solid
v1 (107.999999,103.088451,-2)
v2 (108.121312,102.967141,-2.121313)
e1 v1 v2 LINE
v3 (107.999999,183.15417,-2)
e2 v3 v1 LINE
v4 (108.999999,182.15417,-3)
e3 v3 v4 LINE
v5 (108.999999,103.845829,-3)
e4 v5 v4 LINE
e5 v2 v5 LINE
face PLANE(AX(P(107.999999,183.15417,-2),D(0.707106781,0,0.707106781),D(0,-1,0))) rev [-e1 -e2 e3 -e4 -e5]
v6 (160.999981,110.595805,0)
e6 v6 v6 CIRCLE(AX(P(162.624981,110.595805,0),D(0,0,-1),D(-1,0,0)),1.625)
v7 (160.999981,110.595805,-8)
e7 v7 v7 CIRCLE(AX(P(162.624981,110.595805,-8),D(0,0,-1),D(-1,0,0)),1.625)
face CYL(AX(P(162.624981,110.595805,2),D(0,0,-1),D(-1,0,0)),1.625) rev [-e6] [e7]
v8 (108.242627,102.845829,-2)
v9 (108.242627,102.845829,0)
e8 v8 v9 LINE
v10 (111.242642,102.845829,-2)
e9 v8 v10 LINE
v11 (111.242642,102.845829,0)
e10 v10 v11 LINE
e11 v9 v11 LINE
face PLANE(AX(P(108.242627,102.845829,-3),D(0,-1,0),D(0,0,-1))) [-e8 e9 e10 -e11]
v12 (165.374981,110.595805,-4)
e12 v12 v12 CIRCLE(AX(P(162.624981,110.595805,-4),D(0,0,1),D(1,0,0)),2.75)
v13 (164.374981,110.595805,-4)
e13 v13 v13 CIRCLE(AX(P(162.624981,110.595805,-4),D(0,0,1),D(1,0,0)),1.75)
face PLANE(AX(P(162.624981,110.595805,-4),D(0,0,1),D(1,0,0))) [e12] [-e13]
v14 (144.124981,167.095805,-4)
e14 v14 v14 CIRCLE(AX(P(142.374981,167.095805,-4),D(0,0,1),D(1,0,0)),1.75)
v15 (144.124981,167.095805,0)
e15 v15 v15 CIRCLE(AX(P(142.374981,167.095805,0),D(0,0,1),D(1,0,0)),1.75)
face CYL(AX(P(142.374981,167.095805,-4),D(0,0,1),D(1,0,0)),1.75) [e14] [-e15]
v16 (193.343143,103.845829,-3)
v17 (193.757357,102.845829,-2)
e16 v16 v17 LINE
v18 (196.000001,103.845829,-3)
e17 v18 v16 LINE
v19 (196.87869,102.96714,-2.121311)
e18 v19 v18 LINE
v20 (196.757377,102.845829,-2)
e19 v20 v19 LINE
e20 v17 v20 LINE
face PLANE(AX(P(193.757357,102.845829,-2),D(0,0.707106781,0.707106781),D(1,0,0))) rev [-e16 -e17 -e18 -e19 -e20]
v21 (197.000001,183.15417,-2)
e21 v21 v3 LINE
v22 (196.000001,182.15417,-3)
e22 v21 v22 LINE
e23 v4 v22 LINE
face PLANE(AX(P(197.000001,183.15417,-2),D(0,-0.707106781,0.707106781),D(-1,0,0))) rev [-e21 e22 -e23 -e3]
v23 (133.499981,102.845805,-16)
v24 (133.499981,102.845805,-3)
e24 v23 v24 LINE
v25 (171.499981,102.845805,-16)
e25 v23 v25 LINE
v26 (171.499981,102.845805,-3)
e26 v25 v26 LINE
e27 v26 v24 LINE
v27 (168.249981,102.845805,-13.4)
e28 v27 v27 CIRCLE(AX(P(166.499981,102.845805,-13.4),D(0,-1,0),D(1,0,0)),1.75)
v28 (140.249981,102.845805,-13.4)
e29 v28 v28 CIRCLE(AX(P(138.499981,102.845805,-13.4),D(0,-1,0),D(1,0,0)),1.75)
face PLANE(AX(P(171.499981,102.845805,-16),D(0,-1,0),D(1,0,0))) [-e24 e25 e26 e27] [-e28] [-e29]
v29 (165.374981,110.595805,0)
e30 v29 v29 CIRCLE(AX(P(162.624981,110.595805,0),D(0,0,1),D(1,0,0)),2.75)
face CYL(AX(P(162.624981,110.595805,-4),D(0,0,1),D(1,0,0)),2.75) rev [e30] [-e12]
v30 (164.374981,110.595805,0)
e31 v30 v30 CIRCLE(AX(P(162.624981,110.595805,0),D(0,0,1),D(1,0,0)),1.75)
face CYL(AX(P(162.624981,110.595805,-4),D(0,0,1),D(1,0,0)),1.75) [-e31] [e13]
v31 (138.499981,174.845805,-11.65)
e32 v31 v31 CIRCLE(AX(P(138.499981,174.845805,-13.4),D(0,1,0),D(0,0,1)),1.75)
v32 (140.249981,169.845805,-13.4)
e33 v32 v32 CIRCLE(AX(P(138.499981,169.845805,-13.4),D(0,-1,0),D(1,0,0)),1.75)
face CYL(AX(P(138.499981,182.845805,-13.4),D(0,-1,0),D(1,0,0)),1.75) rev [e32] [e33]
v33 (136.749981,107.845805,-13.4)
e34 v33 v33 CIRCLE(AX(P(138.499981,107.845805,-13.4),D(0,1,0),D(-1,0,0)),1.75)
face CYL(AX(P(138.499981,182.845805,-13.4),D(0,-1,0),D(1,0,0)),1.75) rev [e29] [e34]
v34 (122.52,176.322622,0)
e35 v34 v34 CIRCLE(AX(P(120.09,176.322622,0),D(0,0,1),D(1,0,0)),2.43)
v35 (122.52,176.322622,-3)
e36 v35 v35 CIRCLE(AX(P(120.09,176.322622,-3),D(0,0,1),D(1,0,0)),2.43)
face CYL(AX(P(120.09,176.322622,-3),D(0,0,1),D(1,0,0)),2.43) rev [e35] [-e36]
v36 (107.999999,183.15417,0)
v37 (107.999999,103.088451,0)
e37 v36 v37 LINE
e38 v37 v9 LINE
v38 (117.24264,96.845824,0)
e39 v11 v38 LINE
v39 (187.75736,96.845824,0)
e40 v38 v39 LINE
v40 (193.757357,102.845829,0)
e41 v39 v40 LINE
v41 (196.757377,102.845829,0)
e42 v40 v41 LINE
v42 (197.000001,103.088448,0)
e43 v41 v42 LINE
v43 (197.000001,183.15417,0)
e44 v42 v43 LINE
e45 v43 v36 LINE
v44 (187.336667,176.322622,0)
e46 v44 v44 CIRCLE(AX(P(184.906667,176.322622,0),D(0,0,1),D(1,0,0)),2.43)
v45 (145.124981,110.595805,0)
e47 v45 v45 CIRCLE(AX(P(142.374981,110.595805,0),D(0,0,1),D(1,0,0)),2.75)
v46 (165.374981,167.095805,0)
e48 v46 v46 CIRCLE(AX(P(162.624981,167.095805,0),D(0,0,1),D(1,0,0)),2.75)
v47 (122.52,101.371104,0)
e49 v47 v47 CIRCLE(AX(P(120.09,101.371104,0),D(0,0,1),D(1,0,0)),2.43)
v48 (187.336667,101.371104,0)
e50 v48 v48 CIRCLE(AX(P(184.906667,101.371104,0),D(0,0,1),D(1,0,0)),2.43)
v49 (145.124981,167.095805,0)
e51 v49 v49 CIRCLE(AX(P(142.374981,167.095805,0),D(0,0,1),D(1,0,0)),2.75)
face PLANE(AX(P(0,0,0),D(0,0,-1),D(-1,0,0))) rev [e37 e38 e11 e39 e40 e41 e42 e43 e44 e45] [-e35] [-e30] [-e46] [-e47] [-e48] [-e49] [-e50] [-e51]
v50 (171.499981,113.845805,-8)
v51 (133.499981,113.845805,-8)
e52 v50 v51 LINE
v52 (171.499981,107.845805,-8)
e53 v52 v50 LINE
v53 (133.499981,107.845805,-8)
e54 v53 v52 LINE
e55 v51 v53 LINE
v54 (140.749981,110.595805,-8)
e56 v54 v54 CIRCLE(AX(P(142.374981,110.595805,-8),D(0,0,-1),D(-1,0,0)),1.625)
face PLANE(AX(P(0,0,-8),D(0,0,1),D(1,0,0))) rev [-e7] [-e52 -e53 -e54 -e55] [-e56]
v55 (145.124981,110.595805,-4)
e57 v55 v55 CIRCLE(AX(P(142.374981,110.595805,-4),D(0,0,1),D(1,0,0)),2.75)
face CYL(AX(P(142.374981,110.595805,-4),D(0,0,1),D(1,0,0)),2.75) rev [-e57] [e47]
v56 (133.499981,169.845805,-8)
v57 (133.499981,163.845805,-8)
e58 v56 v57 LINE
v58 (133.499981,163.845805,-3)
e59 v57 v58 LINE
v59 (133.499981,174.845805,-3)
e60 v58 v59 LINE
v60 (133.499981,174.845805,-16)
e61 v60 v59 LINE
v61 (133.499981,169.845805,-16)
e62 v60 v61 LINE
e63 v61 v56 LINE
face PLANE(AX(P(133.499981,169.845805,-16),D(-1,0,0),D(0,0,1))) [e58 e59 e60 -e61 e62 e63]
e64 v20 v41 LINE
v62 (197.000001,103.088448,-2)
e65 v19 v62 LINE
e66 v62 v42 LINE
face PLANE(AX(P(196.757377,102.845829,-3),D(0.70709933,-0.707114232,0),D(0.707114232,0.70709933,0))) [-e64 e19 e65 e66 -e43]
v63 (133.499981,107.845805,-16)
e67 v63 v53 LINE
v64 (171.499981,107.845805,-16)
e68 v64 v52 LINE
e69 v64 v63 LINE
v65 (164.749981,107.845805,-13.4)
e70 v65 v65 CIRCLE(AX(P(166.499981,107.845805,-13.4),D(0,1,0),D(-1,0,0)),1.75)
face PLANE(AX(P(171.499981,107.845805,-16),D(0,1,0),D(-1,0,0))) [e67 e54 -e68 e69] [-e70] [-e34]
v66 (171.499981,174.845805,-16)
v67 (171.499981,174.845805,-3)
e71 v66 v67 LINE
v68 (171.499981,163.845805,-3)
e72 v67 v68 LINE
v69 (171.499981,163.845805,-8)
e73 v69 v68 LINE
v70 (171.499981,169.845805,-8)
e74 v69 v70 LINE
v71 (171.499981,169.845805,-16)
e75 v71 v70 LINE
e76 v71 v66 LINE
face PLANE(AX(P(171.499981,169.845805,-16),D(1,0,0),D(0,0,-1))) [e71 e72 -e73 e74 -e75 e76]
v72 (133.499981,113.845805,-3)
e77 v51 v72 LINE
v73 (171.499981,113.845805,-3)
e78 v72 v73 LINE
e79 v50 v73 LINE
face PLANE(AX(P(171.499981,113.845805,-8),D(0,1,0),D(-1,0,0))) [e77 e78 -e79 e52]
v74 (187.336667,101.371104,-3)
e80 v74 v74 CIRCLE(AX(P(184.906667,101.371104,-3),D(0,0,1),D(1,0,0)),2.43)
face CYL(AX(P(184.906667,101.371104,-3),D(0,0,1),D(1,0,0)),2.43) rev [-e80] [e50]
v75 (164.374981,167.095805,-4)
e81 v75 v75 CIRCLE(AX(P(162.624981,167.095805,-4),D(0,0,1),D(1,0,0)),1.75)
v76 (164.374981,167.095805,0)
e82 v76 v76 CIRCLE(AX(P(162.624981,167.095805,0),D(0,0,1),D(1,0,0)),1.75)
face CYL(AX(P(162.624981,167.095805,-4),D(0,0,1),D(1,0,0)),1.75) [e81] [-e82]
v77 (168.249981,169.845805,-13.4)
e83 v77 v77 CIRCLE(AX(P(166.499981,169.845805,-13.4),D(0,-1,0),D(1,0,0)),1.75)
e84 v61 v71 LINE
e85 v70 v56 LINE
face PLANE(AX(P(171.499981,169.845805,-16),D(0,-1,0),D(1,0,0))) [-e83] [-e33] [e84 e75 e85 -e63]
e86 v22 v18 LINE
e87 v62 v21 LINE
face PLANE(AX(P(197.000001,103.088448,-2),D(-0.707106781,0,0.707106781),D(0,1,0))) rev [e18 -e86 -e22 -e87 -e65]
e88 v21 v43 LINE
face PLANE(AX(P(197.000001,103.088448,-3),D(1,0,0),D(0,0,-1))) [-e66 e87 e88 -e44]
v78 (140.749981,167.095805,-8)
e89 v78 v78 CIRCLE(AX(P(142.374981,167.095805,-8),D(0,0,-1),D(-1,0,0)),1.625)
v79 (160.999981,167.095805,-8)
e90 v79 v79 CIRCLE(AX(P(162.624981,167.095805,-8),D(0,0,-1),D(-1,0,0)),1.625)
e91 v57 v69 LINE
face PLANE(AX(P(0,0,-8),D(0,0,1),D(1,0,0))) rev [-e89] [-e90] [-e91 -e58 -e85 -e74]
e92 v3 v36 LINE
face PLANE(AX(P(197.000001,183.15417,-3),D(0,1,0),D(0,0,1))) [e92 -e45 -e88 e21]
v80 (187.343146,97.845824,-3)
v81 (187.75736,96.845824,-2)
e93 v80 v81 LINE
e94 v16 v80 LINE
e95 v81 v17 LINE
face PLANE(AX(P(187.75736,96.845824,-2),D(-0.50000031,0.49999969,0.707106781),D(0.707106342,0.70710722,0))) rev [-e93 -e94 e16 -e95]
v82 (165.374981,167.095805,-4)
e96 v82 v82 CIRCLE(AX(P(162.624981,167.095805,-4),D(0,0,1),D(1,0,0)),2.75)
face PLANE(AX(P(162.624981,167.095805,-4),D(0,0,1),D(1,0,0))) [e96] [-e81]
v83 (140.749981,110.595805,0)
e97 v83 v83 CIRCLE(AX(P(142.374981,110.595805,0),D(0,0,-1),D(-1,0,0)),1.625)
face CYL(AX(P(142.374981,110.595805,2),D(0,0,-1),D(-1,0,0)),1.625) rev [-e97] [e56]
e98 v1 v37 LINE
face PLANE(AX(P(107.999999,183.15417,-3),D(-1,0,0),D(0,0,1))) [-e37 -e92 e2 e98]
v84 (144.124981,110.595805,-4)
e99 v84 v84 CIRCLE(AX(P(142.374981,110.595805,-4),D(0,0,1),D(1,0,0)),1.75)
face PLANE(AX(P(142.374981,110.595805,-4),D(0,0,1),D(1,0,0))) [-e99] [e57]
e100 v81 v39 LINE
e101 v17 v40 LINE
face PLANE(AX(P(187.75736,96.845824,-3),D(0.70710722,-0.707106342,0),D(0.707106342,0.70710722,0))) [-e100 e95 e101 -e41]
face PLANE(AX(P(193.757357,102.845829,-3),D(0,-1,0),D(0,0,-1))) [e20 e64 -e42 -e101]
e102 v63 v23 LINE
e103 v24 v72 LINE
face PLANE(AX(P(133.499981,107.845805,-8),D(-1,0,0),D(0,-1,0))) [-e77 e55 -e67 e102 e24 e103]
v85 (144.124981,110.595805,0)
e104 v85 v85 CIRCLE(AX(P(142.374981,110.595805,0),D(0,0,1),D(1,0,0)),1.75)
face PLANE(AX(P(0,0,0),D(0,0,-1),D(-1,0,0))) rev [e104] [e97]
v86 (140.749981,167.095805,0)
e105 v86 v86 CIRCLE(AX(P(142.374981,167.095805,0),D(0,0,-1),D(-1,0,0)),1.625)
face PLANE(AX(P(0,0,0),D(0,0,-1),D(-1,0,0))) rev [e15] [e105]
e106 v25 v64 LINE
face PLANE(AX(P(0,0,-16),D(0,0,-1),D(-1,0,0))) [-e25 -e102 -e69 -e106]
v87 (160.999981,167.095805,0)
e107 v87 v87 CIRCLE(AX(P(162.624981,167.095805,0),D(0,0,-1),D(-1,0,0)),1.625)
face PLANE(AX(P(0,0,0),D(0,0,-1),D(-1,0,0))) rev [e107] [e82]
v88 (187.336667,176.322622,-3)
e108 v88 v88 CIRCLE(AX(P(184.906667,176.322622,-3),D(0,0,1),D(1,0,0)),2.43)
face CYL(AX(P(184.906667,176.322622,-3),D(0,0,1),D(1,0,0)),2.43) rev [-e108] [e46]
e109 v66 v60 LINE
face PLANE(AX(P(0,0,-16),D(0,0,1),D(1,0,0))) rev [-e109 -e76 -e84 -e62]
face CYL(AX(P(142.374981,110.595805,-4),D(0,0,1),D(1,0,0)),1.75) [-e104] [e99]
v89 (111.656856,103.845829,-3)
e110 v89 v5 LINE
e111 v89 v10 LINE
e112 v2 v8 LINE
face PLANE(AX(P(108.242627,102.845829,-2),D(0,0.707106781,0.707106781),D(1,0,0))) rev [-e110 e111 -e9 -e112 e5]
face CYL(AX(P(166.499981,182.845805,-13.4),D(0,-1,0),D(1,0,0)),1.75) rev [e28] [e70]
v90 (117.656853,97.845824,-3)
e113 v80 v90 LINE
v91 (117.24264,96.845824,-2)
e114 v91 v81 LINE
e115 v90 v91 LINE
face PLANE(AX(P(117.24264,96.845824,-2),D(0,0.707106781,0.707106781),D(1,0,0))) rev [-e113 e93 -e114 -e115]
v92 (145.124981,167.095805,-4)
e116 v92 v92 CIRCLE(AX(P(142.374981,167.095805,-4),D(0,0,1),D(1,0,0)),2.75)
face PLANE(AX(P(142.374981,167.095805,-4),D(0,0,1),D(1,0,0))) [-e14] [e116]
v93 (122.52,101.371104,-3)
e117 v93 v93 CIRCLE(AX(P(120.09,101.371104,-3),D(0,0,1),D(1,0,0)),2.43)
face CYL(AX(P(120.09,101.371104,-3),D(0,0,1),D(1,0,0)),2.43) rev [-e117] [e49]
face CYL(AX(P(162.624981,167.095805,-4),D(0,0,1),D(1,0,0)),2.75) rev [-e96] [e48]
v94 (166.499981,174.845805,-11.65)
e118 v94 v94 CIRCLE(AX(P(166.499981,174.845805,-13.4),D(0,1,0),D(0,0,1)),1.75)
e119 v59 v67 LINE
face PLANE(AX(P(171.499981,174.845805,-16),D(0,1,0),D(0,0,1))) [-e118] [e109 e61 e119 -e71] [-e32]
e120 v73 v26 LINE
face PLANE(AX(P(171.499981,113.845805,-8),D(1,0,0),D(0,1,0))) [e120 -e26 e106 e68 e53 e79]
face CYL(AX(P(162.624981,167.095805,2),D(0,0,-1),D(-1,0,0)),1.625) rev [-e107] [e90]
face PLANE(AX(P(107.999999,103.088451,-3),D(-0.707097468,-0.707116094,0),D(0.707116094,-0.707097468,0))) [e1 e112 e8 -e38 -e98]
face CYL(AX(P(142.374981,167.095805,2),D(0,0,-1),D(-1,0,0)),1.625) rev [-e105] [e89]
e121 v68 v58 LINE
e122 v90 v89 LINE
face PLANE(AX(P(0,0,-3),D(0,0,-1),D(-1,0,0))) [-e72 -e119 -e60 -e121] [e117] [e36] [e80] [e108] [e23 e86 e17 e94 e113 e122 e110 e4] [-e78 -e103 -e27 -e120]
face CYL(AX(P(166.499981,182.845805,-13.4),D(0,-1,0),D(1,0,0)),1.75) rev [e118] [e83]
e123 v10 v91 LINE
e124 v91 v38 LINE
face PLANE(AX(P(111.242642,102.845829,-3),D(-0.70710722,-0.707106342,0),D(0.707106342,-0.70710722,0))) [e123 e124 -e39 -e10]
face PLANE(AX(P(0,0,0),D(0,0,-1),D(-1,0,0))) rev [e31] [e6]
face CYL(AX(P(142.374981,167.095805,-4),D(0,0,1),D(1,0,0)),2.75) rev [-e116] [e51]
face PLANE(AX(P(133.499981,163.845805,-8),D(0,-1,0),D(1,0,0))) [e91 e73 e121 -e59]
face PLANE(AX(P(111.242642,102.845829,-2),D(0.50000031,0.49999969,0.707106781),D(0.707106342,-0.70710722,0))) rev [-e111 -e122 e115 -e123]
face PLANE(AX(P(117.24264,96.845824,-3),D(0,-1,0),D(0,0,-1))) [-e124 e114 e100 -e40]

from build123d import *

# Parameters (mm, degrees)
SKETCH3_W             = 38
SKETCH3_H             = 6
BOSS_EXTRUDE2_DEPTH   = 8
BOSS_EXTRUDE2_2_DEPTH = 8
SKETCH1_R             = 2.43
BOSS_EXTRUDE3_DEPTH   = 3
CHAMFER1_SIZE         = 1
SKETCH4_W             = 38
SKETCH4_H             = 5
BOSS_EXTRUDE4_DEPTH   = 16
SKETCH5_R             = 1.75
CUT_EXTRUDE1_DEPTH    = 80
SKETCH6_R             = 1.625
CUT_EXTRUDE2_DEPTH    = 10
SKETCH7_R             = 2.75
SKETCH7_R_2           = 1.75
CUT_EXTRUDE3_DEPTH    = 4


with BuildPart() as part:
    # Sketch3 → Boss-Extrude2 (new body)
    with BuildSketch(Plane.XY):
        with Locations((152.499981225, 110.845805079)):
            Rectangle(SKETCH3_W, SKETCH3_H)
    extrude(amount=-BOSS_EXTRUDE2_DEPTH)



with BuildPart() as body_2:
    # Sketch3 → Boss-Extrude2 2 (new body)
    with BuildSketch(Plane.XY):
        with Locations((152.499981225, 166.845805079)):
            Rectangle(SKETCH3_W, SKETCH3_H)
    extrude(amount=-BOSS_EXTRUDE2_2_DEPTH)


with BuildPart() as body_3:
    # Sketch1 → Boss-Extrude3 (new body)
    with BuildSketch(Plane.XY):
        Polygon((197.000000954, 103.088447924), (197.000000954, 183.154169798), (107.999998748, 183.154169798), (107.999998748, 103.08845101), (108.242627497, 102.845828652), (111.242642284, 102.845828652), (117.242639543, 96.845823944), (187.757360159, 96.845823944), (193.757357418, 102.845828652), (196.757376569, 102.845828652), align=None)
        with Locations((184.906666899, 176.322621726)):
            Circle(SKETCH1_R, mode=Mode.SUBTRACT)
        with Locations((120.09, 176.322621726)):
            Circle(SKETCH1_R, mode=Mode.SUBTRACT)
        with Locations((184.906666899, 101.371103796)):
            Circle(SKETCH1_R, mode=Mode.SUBTRACT)
        with Locations((120.09, 101.371103796)):
            Circle(SKETCH1_R, mode=Mode.SUBTRACT)
    extrude(amount=-BOSS_EXTRUDE3_DEPTH)

    # Chamfer1
    # the kernel refuses this chamfer: 1 mm, written as the material it takes off along each edge
    with BuildSketch(Plane(origin=(105.670944509, 102.845828652, -3), x_dir=(0, -0.027495876610582174, 0.9996219169112968), z_dir=(1, 0, 0))) as chamfer1_piece_1_section:
        Polygon((CHAMFER1_SIZE * 0.999621916911, -CHAMFER1_SIZE * 0.0274958766106), (-CHAMFER1_SIZE * 0.0274958766106, -CHAMFER1_SIZE * 0.999621916911), (0, 0), align=None)
    chamfer1_piece_1 = extrude(amount=8.143380763, mode=Mode.PRIVATE)
    chamfer1_piece_1 = split(chamfer1_piece_1, bisect_by=Plane(origin=(109.611460338, 104.477012624, -2.663729969), z_dir=(-0.7071072202160112, -0.7071063421568112, 0)), keep=Keep.TOP, mode=Mode.PRIVATE)
    add(chamfer1_piece_1, mode=Mode.SUBTRACT)
    with BuildSketch(Plane(origin=(109.424188934, 104.664284261, -3), x_dir=(-0.019442532877514053, -0.01944250873450663, 0.9996219169112968), z_dir=(0.7071063421568113, -0.7071072202160114, 0))) as chamfer1_piece_2_section:
        Polygon((CHAMFER1_SIZE * 0.999621916911, -CHAMFER1_SIZE * 0.0274958766106), (-CHAMFER1_SIZE * 0.0274958766106, -CHAMFER1_SIZE * 0.999621916911), (0, 0), align=None)
    chamfer1_piece_2 = extrude(amount=13.628648741, mode=Mode.PRIVATE)
    chamfer1_piece_2 = split(chamfer1_piece_2, bisect_by=Plane(origin=(115.495387611, 102.845828652, -2.667041635), z_dir=(0, -1, 0)), keep=Keep.TOP, mode=Mode.PRIVATE)
    add(chamfer1_piece_2, mode=Mode.SUBTRACT)
    with BuildSketch(Plane(origin=(191.18567443, 102.845828652, -3), x_dir=(0, -0.027495876610582174, 0.9996219169112968), z_dir=(1, 0, 0))) as chamfer1_piece_3_section:
        Polygon((CHAMFER1_SIZE * 0.999621916911, -CHAMFER1_SIZE * 0.0274958766106), (-CHAMFER1_SIZE * 0.0274958766106, -CHAMFER1_SIZE * 0.999621916911), (0, 0), align=None)
    chamfer1_piece_3 = extrude(amount=8.143385128, mode=Mode.PRIVATE)
    chamfer1_piece_3 = split(chamfer1_piece_3, bisect_by=Plane(origin=(195.388540462, 104.477013723, -2.663729975), z_dir=(0.7071072202160112, -0.7071063421568112, 0)), keep=Keep.TOP, mode=Mode.PRIVATE)
    add(chamfer1_piece_3, mode=Mode.SUBTRACT)
    with BuildSketch(Plane(origin=(185.938906809, 95.027368335, -3), x_dir=(0.019442532877507145, -0.019442508734499722, 0.999621916911297), z_dir=(0.7071063421568113, 0.7071072202160114, 0))) as chamfer1_piece_4_section:
        Polygon((CHAMFER1_SIZE * 0.999621916911, -CHAMFER1_SIZE * 0.0274958766106), (-CHAMFER1_SIZE * 0.0274958766106, -CHAMFER1_SIZE * 0.999621916911), (0, 0), align=None)
    chamfer1_piece_4 = extrude(amount=13.628648741, mode=Mode.PRIVATE)
    chamfer1_piece_4 = split(chamfer1_piece_4, bisect_by=Plane(origin=(189.504612091, 102.845828652, -2.667041635), z_dir=(0, -1, 0)), keep=Keep.TOP, mode=Mode.PRIVATE)
    add(chamfer1_piece_4, mode=Mode.SUBTRACT)
    with BuildSketch(Plane(origin=(114.670956555, 96.845823944, -3), x_dir=(0, -0.027495876610582174, 0.9996219169112968), z_dir=(1, 0, 0))) as chamfer1_piece_5:
        Polygon((CHAMFER1_SIZE * 0.999621916911, -CHAMFER1_SIZE * 0.0274958766106), (-CHAMFER1_SIZE * 0.0274958766106, -CHAMFER1_SIZE * 0.999621916911), (0, 0), align=None)
    extrude(amount=75.658086593, mode=Mode.SUBTRACT)
    with BuildSketch(Plane(origin=(107.999998748, 185.725852786, -3), x_dir=(-0.027495876610582174, 0, 0.9996219169112968), z_dir=(0, -1, 0))) as chamfer1_piece_6:
        Polygon((CHAMFER1_SIZE * 0.999621916911, -CHAMFER1_SIZE * 0.0274958766106), (-CHAMFER1_SIZE * 0.0274958766106, -CHAMFER1_SIZE * 0.999621916911), (0, 0), align=None)
    extrude(amount=85.209084764, mode=Mode.SUBTRACT)
    with BuildSketch(Plane(origin=(199.571683942, 183.154169798, -3), x_dir=(0, 0.027495876610582174, 0.9996219169112968), z_dir=(-1, 0, 0))) as chamfer1_piece_7:
        Polygon((CHAMFER1_SIZE * 0.999621916911, -CHAMFER1_SIZE * 0.0274958766106), (-CHAMFER1_SIZE * 0.0274958766106, -CHAMFER1_SIZE * 0.999621916911), (0, 0), align=None)
    extrude(amount=94.143368181, mode=Mode.SUBTRACT)
    with BuildSketch(Plane(origin=(197.000000954, 100.516764936, -3), x_dir=(0.027495876610582174, 0, 0.9996219169112968), z_dir=(0, 1, 0))) as chamfer1_piece_8:
        Polygon((CHAMFER1_SIZE * 0.999621916911, -CHAMFER1_SIZE * 0.0274958766106), (-CHAMFER1_SIZE * 0.0274958766106, -CHAMFER1_SIZE * 0.999621916911), (0, 0), align=None)
    extrude(amount=85.20908785, mode=Mode.SUBTRACT)
    with BuildSketch(Plane(origin=(105.670944509, 102.845828652, -3), x_dir=(0, -0.027495876610582174, 0.9996219169112968), z_dir=(1, 0, 0))) as chamfer1_piece_9a_section:
        Polygon((CHAMFER1_SIZE * 0.999621916911, -CHAMFER1_SIZE * 0.0274958766106), (-CHAMFER1_SIZE * 0.0274958766106, -CHAMFER1_SIZE * 0.999621916911), (0, 0), align=None)
    chamfer1_piece_9a = extrude(amount=8.143380763, mode=Mode.PRIVATE)
    chamfer1_piece_9a = split(chamfer1_piece_9a, bisect_by=Plane(origin=(111.621802536, 102.46666793, -2.681906862), z_dir=(0.7071072202160112, 0.7071063421568112, 0)), keep=Keep.TOP, mode=Mode.PRIVATE)
    with BuildSketch(Plane(origin=(109.424188934, 104.664284261, -3), x_dir=(-0.019442532877514053, -0.01944250873450663, 0.9996219169112968), z_dir=(0.7071063421568113, -0.7071072202160114, 0))) as chamfer1_piece_9b_section:
        Polygon((CHAMFER1_SIZE * 0.999621916911, -CHAMFER1_SIZE * 0.0274958766106), (-CHAMFER1_SIZE * 0.0274958766106, -CHAMFER1_SIZE * 0.999621916911), (0, 0), align=None)
    chamfer1_piece_9b = extrude(amount=13.628648741, mode=Mode.PRIVATE)
    chamfer1_piece_9b = split(chamfer1_piece_9b, bisect_by=Plane(origin=(110.706428382, 102.845828652, -2.681906862), z_dir=(0, 1, 0)), keep=Keep.TOP, mode=Mode.PRIVATE)
    chamfer1_piece_9 = chamfer1_piece_9a & chamfer1_piece_9b
    add(chamfer1_piece_9, mode=Mode.SUBTRACT)
    with BuildSketch(Plane(origin=(185.938906809, 95.027368335, -3), x_dir=(0.019442532877507145, -0.019442508734499722, 0.999621916911297), z_dir=(0.7071063421568113, 0.7071072202160114, 0))) as chamfer1_piece_10a_section:
        Polygon((CHAMFER1_SIZE * 0.999621916911, -CHAMFER1_SIZE * 0.0274958766106), (-CHAMFER1_SIZE * 0.0274958766106, -CHAMFER1_SIZE * 0.999621916911), (0, 0), align=None)
    chamfer1_piece_10a = extrude(amount=13.628648741, mode=Mode.PRIVATE)
    chamfer1_piece_10a = split(chamfer1_piece_10a, bisect_by=Plane(origin=(194.29357132, 102.845828652, -2.681906862), z_dir=(0, 1, 0)), keep=Keep.TOP, mode=Mode.PRIVATE)
    with BuildSketch(Plane(origin=(191.18567443, 102.845828652, -3), x_dir=(0, -0.027495876610582174, 0.9996219169112968), z_dir=(1, 0, 0))) as chamfer1_piece_10b_section:
        Polygon((CHAMFER1_SIZE * 0.999621916911, -CHAMFER1_SIZE * 0.0274958766106), (-CHAMFER1_SIZE * 0.0274958766106, -CHAMFER1_SIZE * 0.999621916911), (0, 0), align=None)
    chamfer1_piece_10b = extrude(amount=8.143385128, mode=Mode.PRIVATE)
    chamfer1_piece_10b = split(chamfer1_piece_10b, bisect_by=Plane(origin=(193.378197166, 102.46666793, -2.681906862), z_dir=(-0.7071072202160112, 0.7071063421568112, 0)), keep=Keep.TOP, mode=Mode.PRIVATE)
    chamfer1_piece_10 = chamfer1_piece_10a & chamfer1_piece_10b
    add(chamfer1_piece_10, mode=Mode.SUBTRACT)


with BuildPart() as part_1:
    add(part.part)

    add(body_2.part)  # Boss-Extrude4 merges body 2

    add(body_3.part)  # Boss-Extrude4 merges body 3
    # Sketch4 → Boss-Extrude4 (add)
    with BuildSketch(Plane.XY):
        with Locations((152.499981225, 172.345805079)):
            Rectangle(SKETCH4_W, SKETCH4_H)
        with Locations((152.499981225, 105.345805079)):
            Rectangle(SKETCH4_W, SKETCH4_H)
    extrude(amount=-BOSS_EXTRUDE4_DEPTH)

    # Sketch5 → Cut-Extrude1 (cut)
    with BuildSketch(Plane(origin=(0, 102.845805079, 0), x_dir=(-1, 0, 0), z_dir=(0, -1, 0))):
        with Locations(Location((-166.499981225, 13.4, 0), (0, 0, 180))):
            Circle(SKETCH5_R)
        with Locations(Location((-138.499981225, 13.4, 0), (0, 0, 180))):
            Circle(SKETCH5_R)
    extrude(amount=-CUT_EXTRUDE1_DEPTH, mode=Mode.SUBTRACT)

    # Sketch6 → Cut-Extrude2 (cut)
    with BuildSketch(Plane(origin=(0, 0, -8), x_dir=(-1, 0, 0), z_dir=(0, 0, -1))):
        with Locations((-162.624981225, 110.595805079)):
            Circle(SKETCH6_R)
        with Locations((-142.374981225, 110.595805079)):
            Circle(SKETCH6_R)
        with Locations((-162.624981225, 167.095805079)):
            Circle(SKETCH6_R)
        with Locations((-142.374981225, 167.095805079)):
            Circle(SKETCH6_R)
    extrude(amount=-CUT_EXTRUDE2_DEPTH, mode=Mode.SUBTRACT)

    # Sketch7 → Cut-Extrude3 (cut)
    # profile 1 of 4: a face of its own
    with BuildSketch(Plane.XY):
        with Locations((162.624981225, 167.095805079)):
            Circle(SKETCH7_R)
        with Locations((162.624981225, 167.095805079)):
            Circle(SKETCH7_R_2, mode=Mode.SUBTRACT)
    # profile 2 of 4: a face of its own
    with BuildSketch(Plane.XY):
        with Locations((142.374981225, 167.095805079)):
            Circle(SKETCH7_R)
        with Locations((142.374981225, 167.095805079)):
            Circle(SKETCH7_R_2, mode=Mode.SUBTRACT)
    # profile 3 of 4: a face of its own
    with BuildSketch(Plane.XY):
        with Locations((162.624981225, 110.595805079)):
            Circle(SKETCH7_R)
        with Locations((162.624981225, 110.595805079)):
            Circle(SKETCH7_R_2, mode=Mode.SUBTRACT)
    # profile 4 of 4: a face of its own
    with BuildSketch(Plane.XY):
        with Locations((142.374981225, 110.595805079)):
            Circle(SKETCH7_R)
        with Locations((142.374981225, 110.595805079)):
            Circle(SKETCH7_R_2, mode=Mode.SUBTRACT)
    extrude(amount=-CUT_EXTRUDE3_DEPTH, mode=Mode.SUBTRACT)


solid = part_1.part
